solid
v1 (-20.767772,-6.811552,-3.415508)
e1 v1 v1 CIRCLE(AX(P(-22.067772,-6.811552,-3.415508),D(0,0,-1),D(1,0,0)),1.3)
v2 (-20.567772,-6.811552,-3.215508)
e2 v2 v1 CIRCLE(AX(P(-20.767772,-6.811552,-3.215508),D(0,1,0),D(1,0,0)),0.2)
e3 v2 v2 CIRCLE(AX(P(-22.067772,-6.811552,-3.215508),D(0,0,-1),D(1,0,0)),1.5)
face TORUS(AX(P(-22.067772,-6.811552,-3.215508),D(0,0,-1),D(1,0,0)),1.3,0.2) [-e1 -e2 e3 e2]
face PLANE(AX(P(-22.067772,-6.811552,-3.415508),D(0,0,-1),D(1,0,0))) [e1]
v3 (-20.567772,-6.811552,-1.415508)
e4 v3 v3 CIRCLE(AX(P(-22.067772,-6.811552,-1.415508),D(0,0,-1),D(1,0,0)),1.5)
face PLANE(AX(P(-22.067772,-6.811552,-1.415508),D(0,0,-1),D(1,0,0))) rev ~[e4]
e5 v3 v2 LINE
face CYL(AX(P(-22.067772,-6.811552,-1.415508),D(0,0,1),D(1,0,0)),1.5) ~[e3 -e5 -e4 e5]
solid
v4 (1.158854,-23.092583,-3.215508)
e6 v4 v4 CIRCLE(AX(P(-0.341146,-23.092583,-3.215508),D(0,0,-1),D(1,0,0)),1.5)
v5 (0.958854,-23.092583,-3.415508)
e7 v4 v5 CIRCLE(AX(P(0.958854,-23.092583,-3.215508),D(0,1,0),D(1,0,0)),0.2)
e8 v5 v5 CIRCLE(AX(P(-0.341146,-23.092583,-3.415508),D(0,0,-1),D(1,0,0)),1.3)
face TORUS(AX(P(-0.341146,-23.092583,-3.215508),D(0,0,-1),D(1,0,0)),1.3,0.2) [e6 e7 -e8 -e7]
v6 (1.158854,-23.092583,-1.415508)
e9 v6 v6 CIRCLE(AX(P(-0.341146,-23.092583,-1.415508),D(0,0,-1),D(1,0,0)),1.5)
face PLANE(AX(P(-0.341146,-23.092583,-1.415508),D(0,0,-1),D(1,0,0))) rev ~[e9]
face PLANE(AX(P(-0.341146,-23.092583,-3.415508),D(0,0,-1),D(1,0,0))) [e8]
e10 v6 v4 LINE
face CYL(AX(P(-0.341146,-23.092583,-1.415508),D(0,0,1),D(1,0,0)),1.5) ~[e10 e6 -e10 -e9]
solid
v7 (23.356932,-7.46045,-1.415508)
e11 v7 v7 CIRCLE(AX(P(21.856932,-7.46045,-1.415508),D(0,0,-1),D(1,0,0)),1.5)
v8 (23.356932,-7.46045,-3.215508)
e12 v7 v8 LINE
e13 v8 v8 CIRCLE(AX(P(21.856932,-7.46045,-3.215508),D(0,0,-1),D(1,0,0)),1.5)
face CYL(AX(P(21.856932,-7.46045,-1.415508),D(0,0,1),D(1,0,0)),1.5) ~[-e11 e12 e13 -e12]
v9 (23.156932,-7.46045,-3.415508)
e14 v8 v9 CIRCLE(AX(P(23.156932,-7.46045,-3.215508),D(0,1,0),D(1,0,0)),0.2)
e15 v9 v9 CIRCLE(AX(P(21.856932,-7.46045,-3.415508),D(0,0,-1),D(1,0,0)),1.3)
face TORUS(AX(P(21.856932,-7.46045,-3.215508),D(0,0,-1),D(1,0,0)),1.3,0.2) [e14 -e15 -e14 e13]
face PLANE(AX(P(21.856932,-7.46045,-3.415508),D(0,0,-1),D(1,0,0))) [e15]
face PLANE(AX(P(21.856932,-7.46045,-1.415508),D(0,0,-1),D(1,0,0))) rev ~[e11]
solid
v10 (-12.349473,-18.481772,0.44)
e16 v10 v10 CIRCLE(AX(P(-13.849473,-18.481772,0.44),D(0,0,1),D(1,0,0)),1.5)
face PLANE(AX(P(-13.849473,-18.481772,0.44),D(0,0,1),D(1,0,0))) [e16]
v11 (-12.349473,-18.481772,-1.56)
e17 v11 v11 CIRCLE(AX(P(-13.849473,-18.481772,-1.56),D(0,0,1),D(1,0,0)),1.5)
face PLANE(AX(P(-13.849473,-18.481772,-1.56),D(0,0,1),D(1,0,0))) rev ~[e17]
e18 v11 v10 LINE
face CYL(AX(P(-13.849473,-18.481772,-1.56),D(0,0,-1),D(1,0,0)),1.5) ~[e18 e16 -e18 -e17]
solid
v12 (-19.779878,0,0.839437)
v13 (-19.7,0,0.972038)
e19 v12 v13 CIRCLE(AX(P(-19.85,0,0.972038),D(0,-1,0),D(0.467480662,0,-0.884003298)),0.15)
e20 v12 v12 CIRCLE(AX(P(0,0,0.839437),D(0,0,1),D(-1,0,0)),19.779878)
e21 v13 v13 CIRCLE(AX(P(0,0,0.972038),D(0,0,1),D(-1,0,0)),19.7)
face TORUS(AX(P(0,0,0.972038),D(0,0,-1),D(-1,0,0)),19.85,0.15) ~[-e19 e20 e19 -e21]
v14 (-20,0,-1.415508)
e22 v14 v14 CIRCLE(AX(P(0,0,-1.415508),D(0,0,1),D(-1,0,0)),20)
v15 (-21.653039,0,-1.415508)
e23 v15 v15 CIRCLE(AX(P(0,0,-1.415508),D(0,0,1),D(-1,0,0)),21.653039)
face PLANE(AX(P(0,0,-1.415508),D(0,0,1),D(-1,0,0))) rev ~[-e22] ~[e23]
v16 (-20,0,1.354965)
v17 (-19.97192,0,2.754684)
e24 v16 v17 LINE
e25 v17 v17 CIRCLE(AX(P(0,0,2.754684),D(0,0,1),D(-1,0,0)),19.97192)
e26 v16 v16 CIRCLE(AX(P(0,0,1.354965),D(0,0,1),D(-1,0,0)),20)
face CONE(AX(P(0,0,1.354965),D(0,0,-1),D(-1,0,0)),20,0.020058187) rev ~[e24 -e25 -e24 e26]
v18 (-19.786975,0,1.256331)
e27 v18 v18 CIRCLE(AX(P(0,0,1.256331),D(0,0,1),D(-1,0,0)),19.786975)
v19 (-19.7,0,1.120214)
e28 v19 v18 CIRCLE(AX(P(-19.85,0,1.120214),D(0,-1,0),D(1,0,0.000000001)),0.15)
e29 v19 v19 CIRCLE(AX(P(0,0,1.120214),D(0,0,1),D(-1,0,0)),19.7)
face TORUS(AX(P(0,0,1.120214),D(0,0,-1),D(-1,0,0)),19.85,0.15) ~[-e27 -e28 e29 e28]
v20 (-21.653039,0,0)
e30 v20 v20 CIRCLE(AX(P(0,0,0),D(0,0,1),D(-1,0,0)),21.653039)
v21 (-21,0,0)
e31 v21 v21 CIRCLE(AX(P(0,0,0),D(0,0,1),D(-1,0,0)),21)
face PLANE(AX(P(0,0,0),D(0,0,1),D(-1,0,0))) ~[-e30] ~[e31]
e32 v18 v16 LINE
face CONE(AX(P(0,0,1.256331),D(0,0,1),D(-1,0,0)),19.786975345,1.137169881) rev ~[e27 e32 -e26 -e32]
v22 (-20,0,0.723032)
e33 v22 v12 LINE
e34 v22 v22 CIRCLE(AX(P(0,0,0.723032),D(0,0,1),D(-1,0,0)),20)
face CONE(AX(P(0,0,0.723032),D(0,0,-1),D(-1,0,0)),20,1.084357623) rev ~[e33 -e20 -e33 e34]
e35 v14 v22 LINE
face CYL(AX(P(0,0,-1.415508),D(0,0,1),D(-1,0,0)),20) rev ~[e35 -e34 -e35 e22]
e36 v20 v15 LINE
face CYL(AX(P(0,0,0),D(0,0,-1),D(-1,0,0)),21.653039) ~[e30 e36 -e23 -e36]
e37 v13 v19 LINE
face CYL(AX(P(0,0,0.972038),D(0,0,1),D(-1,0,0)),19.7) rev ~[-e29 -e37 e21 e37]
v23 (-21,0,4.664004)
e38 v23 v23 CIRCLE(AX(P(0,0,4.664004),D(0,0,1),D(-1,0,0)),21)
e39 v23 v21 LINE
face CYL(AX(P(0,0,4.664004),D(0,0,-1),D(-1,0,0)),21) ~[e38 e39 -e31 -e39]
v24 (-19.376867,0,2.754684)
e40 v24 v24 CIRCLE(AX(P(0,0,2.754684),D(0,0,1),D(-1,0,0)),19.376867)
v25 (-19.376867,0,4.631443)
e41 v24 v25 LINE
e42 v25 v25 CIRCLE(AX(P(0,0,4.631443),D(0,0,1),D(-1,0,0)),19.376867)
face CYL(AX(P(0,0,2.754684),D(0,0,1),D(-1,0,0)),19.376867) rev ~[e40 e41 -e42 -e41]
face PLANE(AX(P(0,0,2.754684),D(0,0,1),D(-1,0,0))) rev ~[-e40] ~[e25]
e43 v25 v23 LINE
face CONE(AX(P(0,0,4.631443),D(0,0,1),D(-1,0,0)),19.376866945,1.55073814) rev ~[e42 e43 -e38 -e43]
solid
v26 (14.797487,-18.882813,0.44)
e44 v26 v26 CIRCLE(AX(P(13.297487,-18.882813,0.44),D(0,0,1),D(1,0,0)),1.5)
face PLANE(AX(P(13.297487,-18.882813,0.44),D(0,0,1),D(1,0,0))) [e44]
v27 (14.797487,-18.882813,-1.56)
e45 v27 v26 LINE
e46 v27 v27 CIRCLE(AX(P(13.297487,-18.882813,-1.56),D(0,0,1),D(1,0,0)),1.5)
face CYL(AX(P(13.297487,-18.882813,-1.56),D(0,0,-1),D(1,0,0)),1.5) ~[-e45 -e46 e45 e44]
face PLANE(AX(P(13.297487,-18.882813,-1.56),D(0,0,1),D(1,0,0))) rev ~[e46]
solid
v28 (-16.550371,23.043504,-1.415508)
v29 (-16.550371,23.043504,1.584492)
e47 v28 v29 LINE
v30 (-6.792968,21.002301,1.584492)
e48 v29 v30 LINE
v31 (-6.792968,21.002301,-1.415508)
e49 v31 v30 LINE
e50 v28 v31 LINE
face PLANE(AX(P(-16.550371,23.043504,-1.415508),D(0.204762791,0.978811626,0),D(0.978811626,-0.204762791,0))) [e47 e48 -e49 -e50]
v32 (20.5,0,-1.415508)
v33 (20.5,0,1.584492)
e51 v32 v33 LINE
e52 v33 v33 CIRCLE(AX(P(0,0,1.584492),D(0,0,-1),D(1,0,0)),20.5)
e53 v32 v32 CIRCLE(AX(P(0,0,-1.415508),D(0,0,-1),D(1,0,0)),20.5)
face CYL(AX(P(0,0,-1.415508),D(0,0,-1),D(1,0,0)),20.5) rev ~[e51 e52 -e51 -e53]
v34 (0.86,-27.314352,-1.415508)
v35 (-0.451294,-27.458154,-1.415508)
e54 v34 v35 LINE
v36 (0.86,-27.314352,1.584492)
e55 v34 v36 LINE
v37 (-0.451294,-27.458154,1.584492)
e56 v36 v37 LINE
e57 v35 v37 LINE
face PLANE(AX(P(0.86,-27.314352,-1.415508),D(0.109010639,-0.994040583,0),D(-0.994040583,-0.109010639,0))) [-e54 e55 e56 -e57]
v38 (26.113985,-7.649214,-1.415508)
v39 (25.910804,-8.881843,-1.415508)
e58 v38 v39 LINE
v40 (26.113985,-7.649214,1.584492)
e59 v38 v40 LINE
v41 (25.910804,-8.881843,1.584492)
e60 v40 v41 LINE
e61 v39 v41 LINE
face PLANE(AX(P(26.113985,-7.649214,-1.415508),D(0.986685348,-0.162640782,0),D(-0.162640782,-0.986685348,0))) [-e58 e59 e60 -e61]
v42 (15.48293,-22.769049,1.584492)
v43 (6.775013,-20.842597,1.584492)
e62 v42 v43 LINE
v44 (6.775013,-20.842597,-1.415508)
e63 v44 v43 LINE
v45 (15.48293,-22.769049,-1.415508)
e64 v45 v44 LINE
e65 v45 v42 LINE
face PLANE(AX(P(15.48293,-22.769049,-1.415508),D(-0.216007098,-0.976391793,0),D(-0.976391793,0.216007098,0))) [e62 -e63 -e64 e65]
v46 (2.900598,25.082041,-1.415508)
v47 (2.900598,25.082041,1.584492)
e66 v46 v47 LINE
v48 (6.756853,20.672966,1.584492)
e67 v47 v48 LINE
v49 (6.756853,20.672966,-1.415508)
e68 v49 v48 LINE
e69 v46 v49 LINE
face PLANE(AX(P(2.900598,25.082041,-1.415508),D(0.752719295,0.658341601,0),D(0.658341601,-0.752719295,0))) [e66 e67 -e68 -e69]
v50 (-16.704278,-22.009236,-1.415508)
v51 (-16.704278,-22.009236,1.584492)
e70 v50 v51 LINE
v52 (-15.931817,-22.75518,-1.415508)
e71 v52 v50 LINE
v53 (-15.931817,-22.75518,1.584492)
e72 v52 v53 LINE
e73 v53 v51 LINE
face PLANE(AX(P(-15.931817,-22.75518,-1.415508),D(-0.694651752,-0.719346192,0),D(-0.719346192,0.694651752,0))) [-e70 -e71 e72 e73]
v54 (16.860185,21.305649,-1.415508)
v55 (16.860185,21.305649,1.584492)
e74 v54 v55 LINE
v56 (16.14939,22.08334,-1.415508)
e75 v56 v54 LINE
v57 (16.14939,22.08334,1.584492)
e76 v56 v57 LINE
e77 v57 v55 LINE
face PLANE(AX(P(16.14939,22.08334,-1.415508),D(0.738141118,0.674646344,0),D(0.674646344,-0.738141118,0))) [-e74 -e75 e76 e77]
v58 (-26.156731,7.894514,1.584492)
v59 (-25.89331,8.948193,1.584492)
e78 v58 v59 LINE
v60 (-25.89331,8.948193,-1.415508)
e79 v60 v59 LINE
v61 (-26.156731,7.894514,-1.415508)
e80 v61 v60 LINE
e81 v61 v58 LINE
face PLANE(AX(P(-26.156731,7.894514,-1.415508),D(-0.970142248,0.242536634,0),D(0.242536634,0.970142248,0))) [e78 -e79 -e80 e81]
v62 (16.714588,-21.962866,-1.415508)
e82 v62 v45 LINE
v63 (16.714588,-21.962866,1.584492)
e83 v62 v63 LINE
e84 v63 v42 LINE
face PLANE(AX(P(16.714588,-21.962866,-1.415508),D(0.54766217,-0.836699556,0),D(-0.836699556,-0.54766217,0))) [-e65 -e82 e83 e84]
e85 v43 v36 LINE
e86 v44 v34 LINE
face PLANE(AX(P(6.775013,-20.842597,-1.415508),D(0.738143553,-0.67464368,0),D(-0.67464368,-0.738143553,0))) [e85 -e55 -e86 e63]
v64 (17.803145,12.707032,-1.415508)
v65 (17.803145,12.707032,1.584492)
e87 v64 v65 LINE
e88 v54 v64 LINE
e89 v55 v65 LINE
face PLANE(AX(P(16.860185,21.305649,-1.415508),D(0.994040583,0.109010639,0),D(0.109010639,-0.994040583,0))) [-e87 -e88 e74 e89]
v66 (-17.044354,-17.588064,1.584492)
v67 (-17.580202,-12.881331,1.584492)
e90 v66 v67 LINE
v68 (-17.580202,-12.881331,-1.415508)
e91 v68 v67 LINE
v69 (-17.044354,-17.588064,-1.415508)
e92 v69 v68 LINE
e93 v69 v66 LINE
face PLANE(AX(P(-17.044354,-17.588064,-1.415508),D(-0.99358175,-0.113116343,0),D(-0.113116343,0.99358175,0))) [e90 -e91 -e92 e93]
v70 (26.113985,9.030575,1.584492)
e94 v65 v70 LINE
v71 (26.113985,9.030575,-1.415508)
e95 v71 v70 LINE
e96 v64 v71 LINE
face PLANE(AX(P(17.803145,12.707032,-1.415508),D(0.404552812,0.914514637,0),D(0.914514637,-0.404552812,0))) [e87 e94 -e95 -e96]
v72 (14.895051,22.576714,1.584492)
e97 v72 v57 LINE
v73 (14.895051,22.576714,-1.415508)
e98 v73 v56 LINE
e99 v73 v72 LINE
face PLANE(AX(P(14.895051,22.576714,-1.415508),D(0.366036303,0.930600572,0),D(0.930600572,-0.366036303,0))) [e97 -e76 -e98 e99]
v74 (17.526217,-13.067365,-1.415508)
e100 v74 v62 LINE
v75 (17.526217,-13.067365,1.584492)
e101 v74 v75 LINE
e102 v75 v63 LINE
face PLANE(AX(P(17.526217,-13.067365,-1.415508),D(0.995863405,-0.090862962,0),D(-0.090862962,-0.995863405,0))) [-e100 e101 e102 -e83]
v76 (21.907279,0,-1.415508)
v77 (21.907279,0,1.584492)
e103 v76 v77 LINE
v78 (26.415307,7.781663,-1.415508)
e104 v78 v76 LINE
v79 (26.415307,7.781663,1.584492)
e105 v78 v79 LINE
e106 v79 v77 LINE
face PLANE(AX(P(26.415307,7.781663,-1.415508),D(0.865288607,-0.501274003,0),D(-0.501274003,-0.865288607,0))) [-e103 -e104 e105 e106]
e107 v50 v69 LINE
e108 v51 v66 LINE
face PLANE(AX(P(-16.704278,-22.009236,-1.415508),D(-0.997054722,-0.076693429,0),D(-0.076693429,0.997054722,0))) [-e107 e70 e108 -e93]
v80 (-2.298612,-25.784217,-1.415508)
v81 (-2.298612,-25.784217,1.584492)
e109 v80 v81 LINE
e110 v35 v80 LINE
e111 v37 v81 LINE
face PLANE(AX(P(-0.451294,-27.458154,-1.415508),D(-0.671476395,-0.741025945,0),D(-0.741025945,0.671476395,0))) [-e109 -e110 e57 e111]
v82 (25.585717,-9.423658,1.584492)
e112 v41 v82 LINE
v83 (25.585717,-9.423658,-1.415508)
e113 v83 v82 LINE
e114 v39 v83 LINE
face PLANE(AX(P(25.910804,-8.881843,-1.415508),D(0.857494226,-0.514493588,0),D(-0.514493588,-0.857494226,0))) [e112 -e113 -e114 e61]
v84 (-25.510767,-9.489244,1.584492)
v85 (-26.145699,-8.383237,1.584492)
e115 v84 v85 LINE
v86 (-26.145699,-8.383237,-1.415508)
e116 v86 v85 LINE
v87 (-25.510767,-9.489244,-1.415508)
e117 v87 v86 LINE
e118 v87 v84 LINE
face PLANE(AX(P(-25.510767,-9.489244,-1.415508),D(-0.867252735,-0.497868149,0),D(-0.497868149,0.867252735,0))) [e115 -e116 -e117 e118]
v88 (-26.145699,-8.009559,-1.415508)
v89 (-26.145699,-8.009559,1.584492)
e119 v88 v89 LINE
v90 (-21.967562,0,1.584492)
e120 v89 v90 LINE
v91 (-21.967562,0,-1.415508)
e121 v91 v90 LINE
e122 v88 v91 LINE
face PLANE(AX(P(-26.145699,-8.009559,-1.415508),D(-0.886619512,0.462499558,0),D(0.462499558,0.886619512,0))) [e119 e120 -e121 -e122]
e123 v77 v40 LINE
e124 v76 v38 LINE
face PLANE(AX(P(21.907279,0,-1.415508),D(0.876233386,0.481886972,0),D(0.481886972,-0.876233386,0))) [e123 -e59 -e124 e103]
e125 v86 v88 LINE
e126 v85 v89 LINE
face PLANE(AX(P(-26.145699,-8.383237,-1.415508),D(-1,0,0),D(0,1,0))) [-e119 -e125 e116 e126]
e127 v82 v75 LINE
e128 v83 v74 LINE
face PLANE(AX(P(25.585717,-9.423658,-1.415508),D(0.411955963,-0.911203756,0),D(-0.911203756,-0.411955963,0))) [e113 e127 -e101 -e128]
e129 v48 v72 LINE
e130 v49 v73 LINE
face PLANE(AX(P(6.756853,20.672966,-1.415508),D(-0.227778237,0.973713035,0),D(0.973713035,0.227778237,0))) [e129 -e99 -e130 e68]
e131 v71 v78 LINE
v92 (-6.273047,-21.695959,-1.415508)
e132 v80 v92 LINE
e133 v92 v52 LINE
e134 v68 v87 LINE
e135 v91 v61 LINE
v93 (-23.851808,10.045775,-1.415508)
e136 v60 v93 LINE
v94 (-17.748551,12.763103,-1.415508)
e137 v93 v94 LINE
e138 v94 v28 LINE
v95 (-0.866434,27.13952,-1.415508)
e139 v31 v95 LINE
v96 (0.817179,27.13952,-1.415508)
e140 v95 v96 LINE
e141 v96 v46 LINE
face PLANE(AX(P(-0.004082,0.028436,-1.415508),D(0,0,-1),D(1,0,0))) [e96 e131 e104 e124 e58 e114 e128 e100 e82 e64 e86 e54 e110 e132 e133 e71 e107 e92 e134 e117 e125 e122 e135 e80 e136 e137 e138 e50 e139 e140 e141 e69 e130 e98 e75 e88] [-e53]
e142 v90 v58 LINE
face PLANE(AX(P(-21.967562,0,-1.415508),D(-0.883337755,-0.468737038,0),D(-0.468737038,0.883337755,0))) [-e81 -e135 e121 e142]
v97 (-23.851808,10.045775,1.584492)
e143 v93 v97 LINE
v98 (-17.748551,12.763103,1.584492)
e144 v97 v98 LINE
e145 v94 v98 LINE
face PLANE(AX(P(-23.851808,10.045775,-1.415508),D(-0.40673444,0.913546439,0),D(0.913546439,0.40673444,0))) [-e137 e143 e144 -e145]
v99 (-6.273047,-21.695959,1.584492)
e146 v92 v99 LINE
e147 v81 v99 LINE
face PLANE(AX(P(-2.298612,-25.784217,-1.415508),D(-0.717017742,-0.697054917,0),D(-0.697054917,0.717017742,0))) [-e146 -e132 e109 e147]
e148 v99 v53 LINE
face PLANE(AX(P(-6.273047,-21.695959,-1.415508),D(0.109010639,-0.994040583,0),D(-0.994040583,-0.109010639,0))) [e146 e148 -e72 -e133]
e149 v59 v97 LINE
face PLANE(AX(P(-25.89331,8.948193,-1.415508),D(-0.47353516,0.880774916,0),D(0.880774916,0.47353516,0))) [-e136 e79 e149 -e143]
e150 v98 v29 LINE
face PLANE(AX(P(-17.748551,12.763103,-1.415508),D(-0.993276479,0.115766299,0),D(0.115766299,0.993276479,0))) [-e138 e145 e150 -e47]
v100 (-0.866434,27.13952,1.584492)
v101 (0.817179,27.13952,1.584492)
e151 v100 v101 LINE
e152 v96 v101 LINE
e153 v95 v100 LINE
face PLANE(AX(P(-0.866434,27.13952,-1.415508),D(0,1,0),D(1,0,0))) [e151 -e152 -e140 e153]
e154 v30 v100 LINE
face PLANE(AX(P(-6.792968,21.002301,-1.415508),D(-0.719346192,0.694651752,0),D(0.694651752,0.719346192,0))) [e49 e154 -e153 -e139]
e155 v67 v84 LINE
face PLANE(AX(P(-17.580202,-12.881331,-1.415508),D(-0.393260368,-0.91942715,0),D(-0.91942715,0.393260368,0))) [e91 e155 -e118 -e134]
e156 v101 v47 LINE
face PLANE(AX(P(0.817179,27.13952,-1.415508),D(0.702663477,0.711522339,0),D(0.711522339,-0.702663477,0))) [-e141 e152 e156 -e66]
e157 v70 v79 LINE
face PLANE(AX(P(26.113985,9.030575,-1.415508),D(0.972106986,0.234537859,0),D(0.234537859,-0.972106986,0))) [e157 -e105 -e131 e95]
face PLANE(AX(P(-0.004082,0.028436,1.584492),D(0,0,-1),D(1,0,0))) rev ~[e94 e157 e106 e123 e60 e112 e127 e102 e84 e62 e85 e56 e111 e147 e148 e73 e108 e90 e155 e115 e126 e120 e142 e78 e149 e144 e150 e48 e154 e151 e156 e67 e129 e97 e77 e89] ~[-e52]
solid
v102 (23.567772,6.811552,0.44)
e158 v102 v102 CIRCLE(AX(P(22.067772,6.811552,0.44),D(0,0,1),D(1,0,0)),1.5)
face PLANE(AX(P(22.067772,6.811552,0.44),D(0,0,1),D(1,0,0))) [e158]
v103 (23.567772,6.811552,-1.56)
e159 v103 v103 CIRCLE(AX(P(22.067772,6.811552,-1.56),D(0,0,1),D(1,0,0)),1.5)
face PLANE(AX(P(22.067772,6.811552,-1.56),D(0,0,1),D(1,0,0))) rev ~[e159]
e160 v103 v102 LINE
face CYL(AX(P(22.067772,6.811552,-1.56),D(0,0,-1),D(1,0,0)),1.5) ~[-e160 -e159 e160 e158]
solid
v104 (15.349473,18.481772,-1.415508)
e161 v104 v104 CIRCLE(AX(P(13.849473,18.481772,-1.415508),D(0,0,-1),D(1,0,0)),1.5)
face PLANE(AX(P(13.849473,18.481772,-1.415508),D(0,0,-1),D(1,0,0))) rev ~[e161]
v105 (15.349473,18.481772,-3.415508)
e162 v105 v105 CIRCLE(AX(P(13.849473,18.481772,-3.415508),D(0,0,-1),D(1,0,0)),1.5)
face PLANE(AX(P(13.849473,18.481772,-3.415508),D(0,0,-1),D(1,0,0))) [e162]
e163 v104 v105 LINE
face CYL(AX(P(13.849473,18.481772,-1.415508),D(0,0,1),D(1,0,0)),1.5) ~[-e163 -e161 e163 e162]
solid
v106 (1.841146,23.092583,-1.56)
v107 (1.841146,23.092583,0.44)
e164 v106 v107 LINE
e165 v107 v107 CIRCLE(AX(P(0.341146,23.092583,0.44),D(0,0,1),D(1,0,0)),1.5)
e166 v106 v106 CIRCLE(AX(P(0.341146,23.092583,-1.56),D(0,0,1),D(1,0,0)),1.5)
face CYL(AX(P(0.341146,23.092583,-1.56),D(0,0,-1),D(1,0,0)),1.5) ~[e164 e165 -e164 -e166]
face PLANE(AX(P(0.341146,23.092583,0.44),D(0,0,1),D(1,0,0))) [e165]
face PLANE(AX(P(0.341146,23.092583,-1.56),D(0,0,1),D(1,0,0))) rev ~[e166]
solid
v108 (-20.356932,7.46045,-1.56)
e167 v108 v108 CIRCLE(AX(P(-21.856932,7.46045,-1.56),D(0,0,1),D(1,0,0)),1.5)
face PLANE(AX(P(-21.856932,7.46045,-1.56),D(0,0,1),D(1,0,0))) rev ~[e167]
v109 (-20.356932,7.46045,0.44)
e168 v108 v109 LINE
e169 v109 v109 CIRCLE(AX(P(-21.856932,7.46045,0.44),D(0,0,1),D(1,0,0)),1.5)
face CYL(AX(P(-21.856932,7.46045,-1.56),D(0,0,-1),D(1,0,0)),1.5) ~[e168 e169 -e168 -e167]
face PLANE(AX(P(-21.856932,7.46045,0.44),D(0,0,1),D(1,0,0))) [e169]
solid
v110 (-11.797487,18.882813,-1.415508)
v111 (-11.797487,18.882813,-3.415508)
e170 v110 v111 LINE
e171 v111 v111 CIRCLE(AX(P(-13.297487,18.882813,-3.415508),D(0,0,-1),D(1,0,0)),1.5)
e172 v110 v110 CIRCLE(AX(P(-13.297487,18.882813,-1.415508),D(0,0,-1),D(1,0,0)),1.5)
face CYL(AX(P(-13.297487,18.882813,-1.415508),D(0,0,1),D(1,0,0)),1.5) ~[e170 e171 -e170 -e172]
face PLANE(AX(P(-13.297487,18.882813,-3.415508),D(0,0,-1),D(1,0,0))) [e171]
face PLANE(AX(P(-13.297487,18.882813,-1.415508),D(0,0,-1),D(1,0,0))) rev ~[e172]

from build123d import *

# Parameters (mm, degrees)
F3_R     = 20.5
F4_DEPTH = 3
F5_R     = 1.5
F6_DEPTH = 2
F7_R     = 0.2
F7_2_R   = 0.2
F7_3_R   = 0.2
F8_R     = 1.5
F9_DEPTH = 2


with BuildPart() as f1:
    # F0 (on Front) → F1 (revolve)
    with BuildSketch(Plane.XZ):
        with BuildLine():
            Line((-21, 4.6640044797), (-21, 1.3408993961))
            Line((-21, 1.3408993961), (-21, 0))
            Line((-21, 0), (-21, -1.4155078679))
            Line((-21, -1.4155078679), (-20, -1.4155078679))
            Line((-20, -1.4155078679), (-20, 0.723031953))
            Line((-20, 0.723031953), (-19.7798779008, 0.8394374288))
            ThreePointArc((-19.7798779008, 0.8394374288), (-19.7215120339, 0.8946373902), (-19.7, 0.9720379235))
            Line((-19.7, 0.9720379235), (-19.7, 1.1202138481))
            ThreePointArc((-19.7, 1.1202138481), (-19.7236004385, 1.2009798734), (-19.7869753447, 1.2563310506))
            Line((-19.7869753447, 1.2563310506), (-20, 1.3549652073))
            Line((-20, 1.3549652073), (-19.9719204218, 2.7546835851))
            Line((-19.9719204218, 2.7546835851), (-19.3768669452, 2.7546835851))
            Line((-19.3768669452, 2.7546835851), (-19.3768669452, 4.6314430072))
            Line((-19.3768669452, 4.6314430072), (-21, 4.6640044797))
        make_face()
        Polygon((-21, -1.4155078679), (-21, 0), (-21.1709106225, 0), (-21.6530393809, 0), (-21.6530393809, -1.4155078679), (-21.2582742561, -1.4155078679), align=None)
    revolve(axis=Axis((0, 0, 4.1345077953), (0, 0, 1)))


with BuildPart() as f4:
    # F3 (on face) → F4 (new body)
    with BuildSketch(Plane(origin=(0, 0, -1.4155078679), x_dir=(1, 0, 0), z_dir=(0, 0, -1))):
        Polygon((-17.0443542302, 17.5880640745), (-17.5802018493, 12.8813311458), (-25.5107674748, 9.4892438501), (-26.1456985027, 8.3832368255), (-26.1456985027, 8.0095588431), (-21.9675619155, 0), (-26.1567309499, -7.8945141286), (-25.8933100849, -8.9481929317), (-23.8518081605, -10.0457752123), (-17.7485514432, -12.7631025389), (-16.5503714234, -23.0435039848), (-6.7929682476, -21.0023011101), (-0.866433722, -27.1395202726), (0.8171786401, -27.1395202726), (2.900598105, -25.0820405781), (6.7568528466, -20.6729657948), (14.8950507864, -22.5767139345), (16.1493904889, -22.0833402127), (16.860185191, -21.30564861), (17.8031453724, -12.707031999), (26.1139851063, -9.0305751648), (26.4153070748, -7.7816629782), (21.907278978, 0), (26.1139851063, 7.6492135413), (25.9108040482, 8.8818427175), (25.5857165903, 9.4236582518), (17.526216805, 13.0673646927), (16.7145878077, 21.9628661871), (15.4829295352, 22.76904881), (6.7750127055, 20.8425968885), (0.8599998546, 27.3143518716), (-0.4512939139, 27.4581538186), (-2.2986123804, 25.7842168212), (-6.2730474904, 21.6959586068), (-15.9318167716, 22.7551795542), (-16.7042777427, 22.0092364009), align=None)
        Circle(F3_R, mode=Mode.SUBTRACT)
    extrude(amount=-F4_DEPTH)


with BuildPart() as f6:
    # F5 (on face) → F6 (new body)
    with BuildSketch(Plane(origin=(0, 0, -1.4155078679), x_dir=(1, 0, 0), z_dir=(0, 0, -1))):
        with Locations((21.8569319695, 7.4604498222)):
            Circle(F5_R)
    extrude(amount=F6_DEPTH)

    # F7
    f7_edges = [f6.edges().sort_by_distance(p)[0] for p in [
        (20.356932, -7.46045, -3.415508),
    ]]
    fillet(f7_edges, radius=F7_R)


with BuildPart() as f6b:
    # F5 (on face) → F6, piece 2 (new body)
    with BuildSketch(Plane(origin=(0, 0, -1.4155078679), x_dir=(1, 0, 0), z_dir=(0, 0, -1))):
        with Locations((-0.3411459945, 23.0925833566)):
            Circle(F5_R)
    extrude(amount=F6_DEPTH)

    # F7#2
    f7_2_edges = [f6b.edges().sort_by_distance(p)[0] for p in [
        (-1.841146, -23.092583, -3.415508),
    ]]
    fillet(f7_2_edges, radius=F7_2_R)


with BuildPart() as f6c:
    # F5 (on face) → F6, piece 3 (new body)
    with BuildSketch(Plane(origin=(0, 0, -1.4155078679), x_dir=(1, 0, 0), z_dir=(0, 0, -1))):
        with Locations((-22.0677717892, 6.8115515802)):
            Circle(F5_R)
    extrude(amount=F6_DEPTH)

    # F7#3
    f7_3_edges = [f6c.edges().sort_by_distance(p)[0] for p in [
        (-23.567772, -6.811552, -3.415508),
    ]]
    fillet(f7_3_edges, radius=F7_3_R)


with BuildPart() as f6d:
    # F5 (on face) → F6, piece 4 (new body)
    with BuildSketch(Plane(origin=(0, 0, -1.4155078679), x_dir=(1, 0, 0), z_dir=(0, 0, -1))):
        with Locations((-13.2974870273, -18.8828129639)):
            Circle(F5_R)
    extrude(amount=F6_DEPTH)


with BuildPart() as f6e:
    # F5 (on face) → F6, piece 5 (new body)
    with BuildSketch(Plane(origin=(0, 0, -1.4155078679), x_dir=(1, 0, 0), z_dir=(0, 0, -1))):
        with Locations((13.8494728414, -18.4817717951)):
            Circle(F5_R)
    extrude(amount=F6_DEPTH)


with BuildPart() as f9:
    # F8 (on offset) → F9 (new body)
    with BuildSketch(Plane.XY.offset(-1.56)):
        with Locations((13.2974870273, -18.8828129639)):
            Circle(F8_R)
    extrude(amount=F9_DEPTH)


with BuildPart() as f9b:
    # F8 (on offset) → F9, piece 2 (new body)
    with BuildSketch(Plane.XY.offset(-1.56)):
        with Locations((22.0677717892, 6.8115515802)):
            Circle(F8_R)
    extrude(amount=F9_DEPTH)


with BuildPart() as f9c:
    # F8 (on offset) → F9, piece 3 (new body)
    with BuildSketch(Plane.XY.offset(-1.56)):
        with Locations((0.3411459945, 23.0925833566)):
            Circle(F8_R)
    extrude(amount=F9_DEPTH)


with BuildPart() as f9d:
    # F8 (on offset) → F9, piece 4 (new body)
    with BuildSketch(Plane.XY.offset(-1.56)):
        with Locations((-21.8569319695, 7.4604498222)):
            Circle(F8_R)
    extrude(amount=F9_DEPTH)


with BuildPart() as f9e:
    # F8 (on offset) → F9, piece 5 (new body)
    with BuildSketch(Plane.XY.offset(-1.56)):
        with Locations((-13.8494728414, -18.4817717951)):
            Circle(F8_R)
    extrude(amount=F9_DEPTH)


solid = Compound([f1.part, f4.part, f6.part, f6b.part, f6c.part, f6d.part, f6e.part, f9.part, f9b.part, f9c.part, f9d.part, f9e.part])
